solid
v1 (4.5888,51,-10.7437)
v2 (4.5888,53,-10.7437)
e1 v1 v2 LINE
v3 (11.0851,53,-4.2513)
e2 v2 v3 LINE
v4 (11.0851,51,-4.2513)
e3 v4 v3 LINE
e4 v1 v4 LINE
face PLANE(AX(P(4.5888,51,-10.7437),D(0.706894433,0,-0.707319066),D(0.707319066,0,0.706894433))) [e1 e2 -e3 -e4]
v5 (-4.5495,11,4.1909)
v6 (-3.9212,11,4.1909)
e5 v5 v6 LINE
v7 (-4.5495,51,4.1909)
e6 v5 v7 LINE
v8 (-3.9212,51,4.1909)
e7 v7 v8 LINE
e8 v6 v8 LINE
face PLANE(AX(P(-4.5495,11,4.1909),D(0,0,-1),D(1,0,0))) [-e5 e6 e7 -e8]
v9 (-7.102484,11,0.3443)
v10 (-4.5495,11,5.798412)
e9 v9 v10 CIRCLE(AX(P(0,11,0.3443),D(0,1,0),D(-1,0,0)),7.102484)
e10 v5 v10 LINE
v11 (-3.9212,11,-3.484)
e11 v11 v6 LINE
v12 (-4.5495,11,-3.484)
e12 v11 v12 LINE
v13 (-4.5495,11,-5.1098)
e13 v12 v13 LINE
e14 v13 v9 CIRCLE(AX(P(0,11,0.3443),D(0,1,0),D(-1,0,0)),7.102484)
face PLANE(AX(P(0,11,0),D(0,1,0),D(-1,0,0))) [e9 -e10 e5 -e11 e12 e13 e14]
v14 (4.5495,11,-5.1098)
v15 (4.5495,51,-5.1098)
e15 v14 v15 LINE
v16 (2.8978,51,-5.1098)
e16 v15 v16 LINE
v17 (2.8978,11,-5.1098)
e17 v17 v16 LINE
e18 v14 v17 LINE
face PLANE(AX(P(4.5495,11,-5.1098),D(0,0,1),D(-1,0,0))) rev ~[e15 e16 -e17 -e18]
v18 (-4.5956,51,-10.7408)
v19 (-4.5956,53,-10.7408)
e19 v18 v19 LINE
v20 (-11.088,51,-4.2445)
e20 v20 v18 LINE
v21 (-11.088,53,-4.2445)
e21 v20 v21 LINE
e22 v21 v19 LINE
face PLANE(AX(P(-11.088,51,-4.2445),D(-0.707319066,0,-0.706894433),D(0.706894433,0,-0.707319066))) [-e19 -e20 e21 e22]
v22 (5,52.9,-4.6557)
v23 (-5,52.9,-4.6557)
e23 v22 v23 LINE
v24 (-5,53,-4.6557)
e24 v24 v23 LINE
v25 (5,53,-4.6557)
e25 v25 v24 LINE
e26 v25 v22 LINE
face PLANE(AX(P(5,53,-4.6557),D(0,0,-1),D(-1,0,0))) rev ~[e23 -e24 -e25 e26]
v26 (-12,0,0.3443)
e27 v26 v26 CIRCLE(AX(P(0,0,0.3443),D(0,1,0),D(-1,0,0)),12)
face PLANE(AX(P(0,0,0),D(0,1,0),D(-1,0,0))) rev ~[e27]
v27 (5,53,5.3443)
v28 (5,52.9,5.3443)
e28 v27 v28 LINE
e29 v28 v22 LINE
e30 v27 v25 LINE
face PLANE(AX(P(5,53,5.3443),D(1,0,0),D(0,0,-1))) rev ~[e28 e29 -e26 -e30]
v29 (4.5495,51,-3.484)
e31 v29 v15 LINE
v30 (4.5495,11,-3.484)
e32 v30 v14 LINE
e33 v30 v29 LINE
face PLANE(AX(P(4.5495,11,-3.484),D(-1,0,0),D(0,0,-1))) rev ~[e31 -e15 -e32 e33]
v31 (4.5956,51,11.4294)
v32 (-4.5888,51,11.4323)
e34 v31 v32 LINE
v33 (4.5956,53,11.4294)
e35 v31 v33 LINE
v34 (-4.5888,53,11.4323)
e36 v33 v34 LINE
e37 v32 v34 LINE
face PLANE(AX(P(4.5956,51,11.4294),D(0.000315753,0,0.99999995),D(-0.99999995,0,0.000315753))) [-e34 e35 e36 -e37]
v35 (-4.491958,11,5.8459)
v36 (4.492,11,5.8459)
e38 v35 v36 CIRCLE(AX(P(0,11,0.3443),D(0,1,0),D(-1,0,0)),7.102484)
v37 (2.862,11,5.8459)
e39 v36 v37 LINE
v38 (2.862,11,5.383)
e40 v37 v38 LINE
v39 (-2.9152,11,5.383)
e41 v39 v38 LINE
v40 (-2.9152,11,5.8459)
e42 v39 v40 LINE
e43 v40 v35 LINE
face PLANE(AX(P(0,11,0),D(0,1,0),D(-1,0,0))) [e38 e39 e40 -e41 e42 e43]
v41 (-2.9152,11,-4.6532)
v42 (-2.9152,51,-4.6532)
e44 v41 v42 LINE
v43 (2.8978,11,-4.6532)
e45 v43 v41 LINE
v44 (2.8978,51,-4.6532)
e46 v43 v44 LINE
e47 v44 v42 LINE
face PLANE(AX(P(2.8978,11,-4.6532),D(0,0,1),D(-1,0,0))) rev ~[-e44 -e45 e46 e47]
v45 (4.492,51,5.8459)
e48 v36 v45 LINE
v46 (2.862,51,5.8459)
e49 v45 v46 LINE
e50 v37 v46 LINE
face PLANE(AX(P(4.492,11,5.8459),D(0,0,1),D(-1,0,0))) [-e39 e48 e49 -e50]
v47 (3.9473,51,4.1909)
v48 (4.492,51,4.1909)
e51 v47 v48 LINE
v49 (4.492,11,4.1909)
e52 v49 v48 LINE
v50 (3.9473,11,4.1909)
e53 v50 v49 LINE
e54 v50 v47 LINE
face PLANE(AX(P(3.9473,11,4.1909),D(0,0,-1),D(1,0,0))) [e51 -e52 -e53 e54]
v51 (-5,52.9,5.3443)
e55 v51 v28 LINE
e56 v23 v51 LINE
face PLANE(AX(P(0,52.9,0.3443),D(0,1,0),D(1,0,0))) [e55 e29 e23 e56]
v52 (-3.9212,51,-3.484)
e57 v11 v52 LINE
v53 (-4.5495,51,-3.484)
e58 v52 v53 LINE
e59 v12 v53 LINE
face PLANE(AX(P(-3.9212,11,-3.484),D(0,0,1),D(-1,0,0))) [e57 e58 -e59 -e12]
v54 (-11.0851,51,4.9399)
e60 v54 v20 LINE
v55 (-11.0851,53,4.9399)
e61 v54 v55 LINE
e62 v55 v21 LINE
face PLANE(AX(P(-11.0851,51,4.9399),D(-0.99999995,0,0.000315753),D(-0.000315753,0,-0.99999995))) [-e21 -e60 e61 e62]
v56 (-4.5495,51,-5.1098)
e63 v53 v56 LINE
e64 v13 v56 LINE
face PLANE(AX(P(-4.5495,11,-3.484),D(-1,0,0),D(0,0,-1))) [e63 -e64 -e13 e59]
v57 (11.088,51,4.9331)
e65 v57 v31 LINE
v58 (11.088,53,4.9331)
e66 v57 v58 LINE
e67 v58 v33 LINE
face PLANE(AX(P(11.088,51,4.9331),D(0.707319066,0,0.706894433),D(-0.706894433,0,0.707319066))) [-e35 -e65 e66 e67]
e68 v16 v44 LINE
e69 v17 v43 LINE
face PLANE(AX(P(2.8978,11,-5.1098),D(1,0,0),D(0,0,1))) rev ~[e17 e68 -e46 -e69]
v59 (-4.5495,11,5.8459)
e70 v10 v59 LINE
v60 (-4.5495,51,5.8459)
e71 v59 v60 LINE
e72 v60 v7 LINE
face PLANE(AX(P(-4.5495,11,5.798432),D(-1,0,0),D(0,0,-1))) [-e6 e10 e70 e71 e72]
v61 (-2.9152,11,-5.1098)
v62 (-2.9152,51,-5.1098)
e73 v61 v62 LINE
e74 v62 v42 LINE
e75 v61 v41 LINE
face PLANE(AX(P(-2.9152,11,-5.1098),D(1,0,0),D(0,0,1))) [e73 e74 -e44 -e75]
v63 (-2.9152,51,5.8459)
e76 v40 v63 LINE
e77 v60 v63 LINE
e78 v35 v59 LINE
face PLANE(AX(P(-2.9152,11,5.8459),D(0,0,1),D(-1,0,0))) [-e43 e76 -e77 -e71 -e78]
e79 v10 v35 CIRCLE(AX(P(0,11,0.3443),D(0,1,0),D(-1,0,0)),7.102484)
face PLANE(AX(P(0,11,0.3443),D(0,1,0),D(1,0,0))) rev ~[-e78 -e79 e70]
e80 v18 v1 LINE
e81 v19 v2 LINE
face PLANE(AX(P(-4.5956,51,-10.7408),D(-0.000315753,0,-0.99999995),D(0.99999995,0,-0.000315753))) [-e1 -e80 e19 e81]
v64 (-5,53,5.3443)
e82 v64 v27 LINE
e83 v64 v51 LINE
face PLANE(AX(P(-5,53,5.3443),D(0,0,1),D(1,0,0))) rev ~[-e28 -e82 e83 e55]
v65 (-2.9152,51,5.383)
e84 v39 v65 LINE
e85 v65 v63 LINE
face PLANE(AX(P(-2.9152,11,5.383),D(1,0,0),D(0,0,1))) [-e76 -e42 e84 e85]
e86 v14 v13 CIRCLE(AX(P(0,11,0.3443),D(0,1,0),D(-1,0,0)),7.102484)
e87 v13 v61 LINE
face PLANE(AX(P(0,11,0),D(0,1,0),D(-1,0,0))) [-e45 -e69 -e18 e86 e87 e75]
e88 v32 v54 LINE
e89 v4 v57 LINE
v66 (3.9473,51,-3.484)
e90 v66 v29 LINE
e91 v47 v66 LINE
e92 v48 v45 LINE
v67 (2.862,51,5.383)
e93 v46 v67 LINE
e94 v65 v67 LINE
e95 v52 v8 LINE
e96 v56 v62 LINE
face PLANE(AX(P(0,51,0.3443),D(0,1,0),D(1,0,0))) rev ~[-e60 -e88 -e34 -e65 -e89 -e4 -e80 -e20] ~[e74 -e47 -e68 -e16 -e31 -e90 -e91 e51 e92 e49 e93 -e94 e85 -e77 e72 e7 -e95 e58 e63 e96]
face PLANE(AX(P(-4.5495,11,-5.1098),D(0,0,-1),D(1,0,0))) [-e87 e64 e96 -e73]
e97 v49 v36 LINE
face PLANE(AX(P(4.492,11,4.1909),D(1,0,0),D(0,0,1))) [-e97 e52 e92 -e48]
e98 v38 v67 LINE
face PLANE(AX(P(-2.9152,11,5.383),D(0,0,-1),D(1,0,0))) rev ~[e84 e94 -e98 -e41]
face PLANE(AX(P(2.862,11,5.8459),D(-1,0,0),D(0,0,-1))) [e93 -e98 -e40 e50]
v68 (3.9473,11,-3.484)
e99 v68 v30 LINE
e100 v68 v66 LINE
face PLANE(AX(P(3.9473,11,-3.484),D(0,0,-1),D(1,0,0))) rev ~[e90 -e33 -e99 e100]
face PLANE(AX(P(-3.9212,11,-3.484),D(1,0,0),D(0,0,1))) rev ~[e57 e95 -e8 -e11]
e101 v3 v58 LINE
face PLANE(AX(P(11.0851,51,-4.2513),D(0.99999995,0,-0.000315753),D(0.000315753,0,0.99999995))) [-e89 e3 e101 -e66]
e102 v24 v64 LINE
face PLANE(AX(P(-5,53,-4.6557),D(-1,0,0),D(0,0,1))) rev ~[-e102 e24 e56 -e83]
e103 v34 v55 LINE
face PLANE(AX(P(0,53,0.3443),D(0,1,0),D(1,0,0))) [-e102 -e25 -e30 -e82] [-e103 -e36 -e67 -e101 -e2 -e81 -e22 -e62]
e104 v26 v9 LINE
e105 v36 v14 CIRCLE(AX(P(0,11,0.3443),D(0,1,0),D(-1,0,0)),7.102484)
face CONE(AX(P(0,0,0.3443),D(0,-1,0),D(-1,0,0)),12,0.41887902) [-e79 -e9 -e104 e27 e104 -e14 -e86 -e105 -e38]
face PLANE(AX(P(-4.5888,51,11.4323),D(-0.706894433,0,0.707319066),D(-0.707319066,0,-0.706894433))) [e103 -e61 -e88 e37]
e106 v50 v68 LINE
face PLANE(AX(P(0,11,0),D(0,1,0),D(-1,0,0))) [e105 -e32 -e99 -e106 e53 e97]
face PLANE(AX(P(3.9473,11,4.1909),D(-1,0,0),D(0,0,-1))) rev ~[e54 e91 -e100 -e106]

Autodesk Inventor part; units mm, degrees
ref_plane "YZ Plane" through (0, 0, 0) normal (1, 0, 0) x (0, 1, 0)
ref_plane "XZ Plane" through (0, 0, 0) normal (0, 1, 0) x (-1, 0, 0)
ref_plane "XY Plane" through (0, 0, 0) normal (0, 0, 1) x (1, 0, 0)
sketch "草圖1" plane through (0, 0, 0) normal (0, 1, 0) x (-1, 0, 0)
  circle A0 centre (0, 0.3443) radius 12
  point P0 (0, 0)
  dimension "d0" = 24
extrude "擠出1" add sketch "草圖1" along normal blind 11
draft "面拔模1" angle 24 pull direction (0, 1, 0) faces at (-11.8446, 7.3333, -1.5807) fixed edges at (12, 0, 0.3443)
sketch "草圖2" plane through (0, 11, 0.3443) normal (0, 1, 0) x (1, 0, 0)
  line L0 (-4.5495, -3.8466) -> (-2.9152, -3.8466)
  line L1 (-2.9152, -3.8466) -> (-2.9152, -5.5016)
  line L2 (-2.9152, -5.5016) -> (-4.5495, -5.5016)
  line L3 (-4.5495, -5.5016) -> (-4.5495, -3.8466)
  circle A0 centre (0, 0) radius 7.1025 projected
  line L4 (-4.5495, 5.4541) -> (-2.9152, 5.4541)
  line L5 (-2.9152, 5.4541) -> (-2.9152, 3.8283)
  line L6 (-2.9152, 3.8283) -> (-4.5495, 3.8283)
  line L7 (-4.5495, 3.8283) -> (-4.5495, 5.4541)
  line L8 (4.5495, 5.4541) -> (2.8978, 5.4541)
  line L9 (2.8978, 5.4541) -> (2.8978, 3.8283)
  line L10 (2.8978, 3.8283) -> (4.5495, 3.8283)
  line L11 (4.5495, 3.8283) -> (4.5495, 5.4541)
  line L12 (4.492, -5.5016) -> (2.862, -5.5016)
  line L13 (2.862, -5.5016) -> (2.862, -3.8466)
  line L14 (2.862, -3.8466) -> (4.492, -3.8466)
  line L15 (4.492, -3.8466) -> (4.492, -5.5016)
  line L16 (-3.9212, 3.8283) -> (-3.9212, -3.8466)
  line L17 (-2.9152, -5.0387) -> (2.862, -5.0387)
  line L18 (3.9473, -3.8466) -> (3.9473, 3.8283)
  line L19 (2.8978, 4.9975) -> (-2.9152, 4.9975)
  point P0 (0, 0.3443)
  dimension "d4" = 1.63
extrude "擠出2" add sketch "草圖2" along normal blind 40 contours L0 L1 L2 A0 L3 | L16 L6 L5 L19 L9 L10 L18 L14 L13 L17 L1 L0 | A0 L2 L3 | L6 L7 L4 L5 | L11 L10 L9 L8 | L12 L13 L14 L15
sketch "草圖3" plane through (0, 51, 0.3443) normal (0, 1, 0) x (1, 0, 0)
  circle A0 centre (0, 0) radius 12 projected
  line L0 (-4.5956, 11.0851) -> (4.5888, 11.088)
  line L1 (4.5888, 11.088) -> (11.0851, 4.5956)
  line L2 (11.0851, 4.5956) -> (11.088, -4.5888)
  line L3 (11.088, -4.5888) -> (4.5956, -11.0851)
  line L4 (4.5956, -11.0851) -> (-4.5888, -11.088)
  line L5 (-4.5888, -11.088) -> (-11.0851, -4.5956)
  line L6 (-11.0851, -4.5956) -> (-11.088, 4.5888)
  line L7 (-11.088, 4.5888) -> (-4.5956, 11.0851)
extrude "擠出3" add sketch "草圖3" along normal blind 2 contours L2 L3 L4 L5 L6 L7 L0 L1
sketch "草圖4" plane through (0, 53, 0.3443) normal (0, 1, 0) x (1, 0, 0)
  line L0 (5, -5) -> (5, 5)
  line L1 (5, 5) -> (-5, 5)
  line L2 (-5, 5) -> (-5, -5)
  line L3 (-5, -5) -> (5, -5)
  line L4 (5, -5) -> (-5, 5) construction
  line L5 (5, 5) -> (-5, -5) construction
  point P0 (0, 0.3443)
  point P1 (0, 0)
  dimension "d9" = 10
  dimension "d10" = 10
extrude "擠出4" cut sketch "草圖4" against normal blind 0.1
properties part number "盤子上布丁"
